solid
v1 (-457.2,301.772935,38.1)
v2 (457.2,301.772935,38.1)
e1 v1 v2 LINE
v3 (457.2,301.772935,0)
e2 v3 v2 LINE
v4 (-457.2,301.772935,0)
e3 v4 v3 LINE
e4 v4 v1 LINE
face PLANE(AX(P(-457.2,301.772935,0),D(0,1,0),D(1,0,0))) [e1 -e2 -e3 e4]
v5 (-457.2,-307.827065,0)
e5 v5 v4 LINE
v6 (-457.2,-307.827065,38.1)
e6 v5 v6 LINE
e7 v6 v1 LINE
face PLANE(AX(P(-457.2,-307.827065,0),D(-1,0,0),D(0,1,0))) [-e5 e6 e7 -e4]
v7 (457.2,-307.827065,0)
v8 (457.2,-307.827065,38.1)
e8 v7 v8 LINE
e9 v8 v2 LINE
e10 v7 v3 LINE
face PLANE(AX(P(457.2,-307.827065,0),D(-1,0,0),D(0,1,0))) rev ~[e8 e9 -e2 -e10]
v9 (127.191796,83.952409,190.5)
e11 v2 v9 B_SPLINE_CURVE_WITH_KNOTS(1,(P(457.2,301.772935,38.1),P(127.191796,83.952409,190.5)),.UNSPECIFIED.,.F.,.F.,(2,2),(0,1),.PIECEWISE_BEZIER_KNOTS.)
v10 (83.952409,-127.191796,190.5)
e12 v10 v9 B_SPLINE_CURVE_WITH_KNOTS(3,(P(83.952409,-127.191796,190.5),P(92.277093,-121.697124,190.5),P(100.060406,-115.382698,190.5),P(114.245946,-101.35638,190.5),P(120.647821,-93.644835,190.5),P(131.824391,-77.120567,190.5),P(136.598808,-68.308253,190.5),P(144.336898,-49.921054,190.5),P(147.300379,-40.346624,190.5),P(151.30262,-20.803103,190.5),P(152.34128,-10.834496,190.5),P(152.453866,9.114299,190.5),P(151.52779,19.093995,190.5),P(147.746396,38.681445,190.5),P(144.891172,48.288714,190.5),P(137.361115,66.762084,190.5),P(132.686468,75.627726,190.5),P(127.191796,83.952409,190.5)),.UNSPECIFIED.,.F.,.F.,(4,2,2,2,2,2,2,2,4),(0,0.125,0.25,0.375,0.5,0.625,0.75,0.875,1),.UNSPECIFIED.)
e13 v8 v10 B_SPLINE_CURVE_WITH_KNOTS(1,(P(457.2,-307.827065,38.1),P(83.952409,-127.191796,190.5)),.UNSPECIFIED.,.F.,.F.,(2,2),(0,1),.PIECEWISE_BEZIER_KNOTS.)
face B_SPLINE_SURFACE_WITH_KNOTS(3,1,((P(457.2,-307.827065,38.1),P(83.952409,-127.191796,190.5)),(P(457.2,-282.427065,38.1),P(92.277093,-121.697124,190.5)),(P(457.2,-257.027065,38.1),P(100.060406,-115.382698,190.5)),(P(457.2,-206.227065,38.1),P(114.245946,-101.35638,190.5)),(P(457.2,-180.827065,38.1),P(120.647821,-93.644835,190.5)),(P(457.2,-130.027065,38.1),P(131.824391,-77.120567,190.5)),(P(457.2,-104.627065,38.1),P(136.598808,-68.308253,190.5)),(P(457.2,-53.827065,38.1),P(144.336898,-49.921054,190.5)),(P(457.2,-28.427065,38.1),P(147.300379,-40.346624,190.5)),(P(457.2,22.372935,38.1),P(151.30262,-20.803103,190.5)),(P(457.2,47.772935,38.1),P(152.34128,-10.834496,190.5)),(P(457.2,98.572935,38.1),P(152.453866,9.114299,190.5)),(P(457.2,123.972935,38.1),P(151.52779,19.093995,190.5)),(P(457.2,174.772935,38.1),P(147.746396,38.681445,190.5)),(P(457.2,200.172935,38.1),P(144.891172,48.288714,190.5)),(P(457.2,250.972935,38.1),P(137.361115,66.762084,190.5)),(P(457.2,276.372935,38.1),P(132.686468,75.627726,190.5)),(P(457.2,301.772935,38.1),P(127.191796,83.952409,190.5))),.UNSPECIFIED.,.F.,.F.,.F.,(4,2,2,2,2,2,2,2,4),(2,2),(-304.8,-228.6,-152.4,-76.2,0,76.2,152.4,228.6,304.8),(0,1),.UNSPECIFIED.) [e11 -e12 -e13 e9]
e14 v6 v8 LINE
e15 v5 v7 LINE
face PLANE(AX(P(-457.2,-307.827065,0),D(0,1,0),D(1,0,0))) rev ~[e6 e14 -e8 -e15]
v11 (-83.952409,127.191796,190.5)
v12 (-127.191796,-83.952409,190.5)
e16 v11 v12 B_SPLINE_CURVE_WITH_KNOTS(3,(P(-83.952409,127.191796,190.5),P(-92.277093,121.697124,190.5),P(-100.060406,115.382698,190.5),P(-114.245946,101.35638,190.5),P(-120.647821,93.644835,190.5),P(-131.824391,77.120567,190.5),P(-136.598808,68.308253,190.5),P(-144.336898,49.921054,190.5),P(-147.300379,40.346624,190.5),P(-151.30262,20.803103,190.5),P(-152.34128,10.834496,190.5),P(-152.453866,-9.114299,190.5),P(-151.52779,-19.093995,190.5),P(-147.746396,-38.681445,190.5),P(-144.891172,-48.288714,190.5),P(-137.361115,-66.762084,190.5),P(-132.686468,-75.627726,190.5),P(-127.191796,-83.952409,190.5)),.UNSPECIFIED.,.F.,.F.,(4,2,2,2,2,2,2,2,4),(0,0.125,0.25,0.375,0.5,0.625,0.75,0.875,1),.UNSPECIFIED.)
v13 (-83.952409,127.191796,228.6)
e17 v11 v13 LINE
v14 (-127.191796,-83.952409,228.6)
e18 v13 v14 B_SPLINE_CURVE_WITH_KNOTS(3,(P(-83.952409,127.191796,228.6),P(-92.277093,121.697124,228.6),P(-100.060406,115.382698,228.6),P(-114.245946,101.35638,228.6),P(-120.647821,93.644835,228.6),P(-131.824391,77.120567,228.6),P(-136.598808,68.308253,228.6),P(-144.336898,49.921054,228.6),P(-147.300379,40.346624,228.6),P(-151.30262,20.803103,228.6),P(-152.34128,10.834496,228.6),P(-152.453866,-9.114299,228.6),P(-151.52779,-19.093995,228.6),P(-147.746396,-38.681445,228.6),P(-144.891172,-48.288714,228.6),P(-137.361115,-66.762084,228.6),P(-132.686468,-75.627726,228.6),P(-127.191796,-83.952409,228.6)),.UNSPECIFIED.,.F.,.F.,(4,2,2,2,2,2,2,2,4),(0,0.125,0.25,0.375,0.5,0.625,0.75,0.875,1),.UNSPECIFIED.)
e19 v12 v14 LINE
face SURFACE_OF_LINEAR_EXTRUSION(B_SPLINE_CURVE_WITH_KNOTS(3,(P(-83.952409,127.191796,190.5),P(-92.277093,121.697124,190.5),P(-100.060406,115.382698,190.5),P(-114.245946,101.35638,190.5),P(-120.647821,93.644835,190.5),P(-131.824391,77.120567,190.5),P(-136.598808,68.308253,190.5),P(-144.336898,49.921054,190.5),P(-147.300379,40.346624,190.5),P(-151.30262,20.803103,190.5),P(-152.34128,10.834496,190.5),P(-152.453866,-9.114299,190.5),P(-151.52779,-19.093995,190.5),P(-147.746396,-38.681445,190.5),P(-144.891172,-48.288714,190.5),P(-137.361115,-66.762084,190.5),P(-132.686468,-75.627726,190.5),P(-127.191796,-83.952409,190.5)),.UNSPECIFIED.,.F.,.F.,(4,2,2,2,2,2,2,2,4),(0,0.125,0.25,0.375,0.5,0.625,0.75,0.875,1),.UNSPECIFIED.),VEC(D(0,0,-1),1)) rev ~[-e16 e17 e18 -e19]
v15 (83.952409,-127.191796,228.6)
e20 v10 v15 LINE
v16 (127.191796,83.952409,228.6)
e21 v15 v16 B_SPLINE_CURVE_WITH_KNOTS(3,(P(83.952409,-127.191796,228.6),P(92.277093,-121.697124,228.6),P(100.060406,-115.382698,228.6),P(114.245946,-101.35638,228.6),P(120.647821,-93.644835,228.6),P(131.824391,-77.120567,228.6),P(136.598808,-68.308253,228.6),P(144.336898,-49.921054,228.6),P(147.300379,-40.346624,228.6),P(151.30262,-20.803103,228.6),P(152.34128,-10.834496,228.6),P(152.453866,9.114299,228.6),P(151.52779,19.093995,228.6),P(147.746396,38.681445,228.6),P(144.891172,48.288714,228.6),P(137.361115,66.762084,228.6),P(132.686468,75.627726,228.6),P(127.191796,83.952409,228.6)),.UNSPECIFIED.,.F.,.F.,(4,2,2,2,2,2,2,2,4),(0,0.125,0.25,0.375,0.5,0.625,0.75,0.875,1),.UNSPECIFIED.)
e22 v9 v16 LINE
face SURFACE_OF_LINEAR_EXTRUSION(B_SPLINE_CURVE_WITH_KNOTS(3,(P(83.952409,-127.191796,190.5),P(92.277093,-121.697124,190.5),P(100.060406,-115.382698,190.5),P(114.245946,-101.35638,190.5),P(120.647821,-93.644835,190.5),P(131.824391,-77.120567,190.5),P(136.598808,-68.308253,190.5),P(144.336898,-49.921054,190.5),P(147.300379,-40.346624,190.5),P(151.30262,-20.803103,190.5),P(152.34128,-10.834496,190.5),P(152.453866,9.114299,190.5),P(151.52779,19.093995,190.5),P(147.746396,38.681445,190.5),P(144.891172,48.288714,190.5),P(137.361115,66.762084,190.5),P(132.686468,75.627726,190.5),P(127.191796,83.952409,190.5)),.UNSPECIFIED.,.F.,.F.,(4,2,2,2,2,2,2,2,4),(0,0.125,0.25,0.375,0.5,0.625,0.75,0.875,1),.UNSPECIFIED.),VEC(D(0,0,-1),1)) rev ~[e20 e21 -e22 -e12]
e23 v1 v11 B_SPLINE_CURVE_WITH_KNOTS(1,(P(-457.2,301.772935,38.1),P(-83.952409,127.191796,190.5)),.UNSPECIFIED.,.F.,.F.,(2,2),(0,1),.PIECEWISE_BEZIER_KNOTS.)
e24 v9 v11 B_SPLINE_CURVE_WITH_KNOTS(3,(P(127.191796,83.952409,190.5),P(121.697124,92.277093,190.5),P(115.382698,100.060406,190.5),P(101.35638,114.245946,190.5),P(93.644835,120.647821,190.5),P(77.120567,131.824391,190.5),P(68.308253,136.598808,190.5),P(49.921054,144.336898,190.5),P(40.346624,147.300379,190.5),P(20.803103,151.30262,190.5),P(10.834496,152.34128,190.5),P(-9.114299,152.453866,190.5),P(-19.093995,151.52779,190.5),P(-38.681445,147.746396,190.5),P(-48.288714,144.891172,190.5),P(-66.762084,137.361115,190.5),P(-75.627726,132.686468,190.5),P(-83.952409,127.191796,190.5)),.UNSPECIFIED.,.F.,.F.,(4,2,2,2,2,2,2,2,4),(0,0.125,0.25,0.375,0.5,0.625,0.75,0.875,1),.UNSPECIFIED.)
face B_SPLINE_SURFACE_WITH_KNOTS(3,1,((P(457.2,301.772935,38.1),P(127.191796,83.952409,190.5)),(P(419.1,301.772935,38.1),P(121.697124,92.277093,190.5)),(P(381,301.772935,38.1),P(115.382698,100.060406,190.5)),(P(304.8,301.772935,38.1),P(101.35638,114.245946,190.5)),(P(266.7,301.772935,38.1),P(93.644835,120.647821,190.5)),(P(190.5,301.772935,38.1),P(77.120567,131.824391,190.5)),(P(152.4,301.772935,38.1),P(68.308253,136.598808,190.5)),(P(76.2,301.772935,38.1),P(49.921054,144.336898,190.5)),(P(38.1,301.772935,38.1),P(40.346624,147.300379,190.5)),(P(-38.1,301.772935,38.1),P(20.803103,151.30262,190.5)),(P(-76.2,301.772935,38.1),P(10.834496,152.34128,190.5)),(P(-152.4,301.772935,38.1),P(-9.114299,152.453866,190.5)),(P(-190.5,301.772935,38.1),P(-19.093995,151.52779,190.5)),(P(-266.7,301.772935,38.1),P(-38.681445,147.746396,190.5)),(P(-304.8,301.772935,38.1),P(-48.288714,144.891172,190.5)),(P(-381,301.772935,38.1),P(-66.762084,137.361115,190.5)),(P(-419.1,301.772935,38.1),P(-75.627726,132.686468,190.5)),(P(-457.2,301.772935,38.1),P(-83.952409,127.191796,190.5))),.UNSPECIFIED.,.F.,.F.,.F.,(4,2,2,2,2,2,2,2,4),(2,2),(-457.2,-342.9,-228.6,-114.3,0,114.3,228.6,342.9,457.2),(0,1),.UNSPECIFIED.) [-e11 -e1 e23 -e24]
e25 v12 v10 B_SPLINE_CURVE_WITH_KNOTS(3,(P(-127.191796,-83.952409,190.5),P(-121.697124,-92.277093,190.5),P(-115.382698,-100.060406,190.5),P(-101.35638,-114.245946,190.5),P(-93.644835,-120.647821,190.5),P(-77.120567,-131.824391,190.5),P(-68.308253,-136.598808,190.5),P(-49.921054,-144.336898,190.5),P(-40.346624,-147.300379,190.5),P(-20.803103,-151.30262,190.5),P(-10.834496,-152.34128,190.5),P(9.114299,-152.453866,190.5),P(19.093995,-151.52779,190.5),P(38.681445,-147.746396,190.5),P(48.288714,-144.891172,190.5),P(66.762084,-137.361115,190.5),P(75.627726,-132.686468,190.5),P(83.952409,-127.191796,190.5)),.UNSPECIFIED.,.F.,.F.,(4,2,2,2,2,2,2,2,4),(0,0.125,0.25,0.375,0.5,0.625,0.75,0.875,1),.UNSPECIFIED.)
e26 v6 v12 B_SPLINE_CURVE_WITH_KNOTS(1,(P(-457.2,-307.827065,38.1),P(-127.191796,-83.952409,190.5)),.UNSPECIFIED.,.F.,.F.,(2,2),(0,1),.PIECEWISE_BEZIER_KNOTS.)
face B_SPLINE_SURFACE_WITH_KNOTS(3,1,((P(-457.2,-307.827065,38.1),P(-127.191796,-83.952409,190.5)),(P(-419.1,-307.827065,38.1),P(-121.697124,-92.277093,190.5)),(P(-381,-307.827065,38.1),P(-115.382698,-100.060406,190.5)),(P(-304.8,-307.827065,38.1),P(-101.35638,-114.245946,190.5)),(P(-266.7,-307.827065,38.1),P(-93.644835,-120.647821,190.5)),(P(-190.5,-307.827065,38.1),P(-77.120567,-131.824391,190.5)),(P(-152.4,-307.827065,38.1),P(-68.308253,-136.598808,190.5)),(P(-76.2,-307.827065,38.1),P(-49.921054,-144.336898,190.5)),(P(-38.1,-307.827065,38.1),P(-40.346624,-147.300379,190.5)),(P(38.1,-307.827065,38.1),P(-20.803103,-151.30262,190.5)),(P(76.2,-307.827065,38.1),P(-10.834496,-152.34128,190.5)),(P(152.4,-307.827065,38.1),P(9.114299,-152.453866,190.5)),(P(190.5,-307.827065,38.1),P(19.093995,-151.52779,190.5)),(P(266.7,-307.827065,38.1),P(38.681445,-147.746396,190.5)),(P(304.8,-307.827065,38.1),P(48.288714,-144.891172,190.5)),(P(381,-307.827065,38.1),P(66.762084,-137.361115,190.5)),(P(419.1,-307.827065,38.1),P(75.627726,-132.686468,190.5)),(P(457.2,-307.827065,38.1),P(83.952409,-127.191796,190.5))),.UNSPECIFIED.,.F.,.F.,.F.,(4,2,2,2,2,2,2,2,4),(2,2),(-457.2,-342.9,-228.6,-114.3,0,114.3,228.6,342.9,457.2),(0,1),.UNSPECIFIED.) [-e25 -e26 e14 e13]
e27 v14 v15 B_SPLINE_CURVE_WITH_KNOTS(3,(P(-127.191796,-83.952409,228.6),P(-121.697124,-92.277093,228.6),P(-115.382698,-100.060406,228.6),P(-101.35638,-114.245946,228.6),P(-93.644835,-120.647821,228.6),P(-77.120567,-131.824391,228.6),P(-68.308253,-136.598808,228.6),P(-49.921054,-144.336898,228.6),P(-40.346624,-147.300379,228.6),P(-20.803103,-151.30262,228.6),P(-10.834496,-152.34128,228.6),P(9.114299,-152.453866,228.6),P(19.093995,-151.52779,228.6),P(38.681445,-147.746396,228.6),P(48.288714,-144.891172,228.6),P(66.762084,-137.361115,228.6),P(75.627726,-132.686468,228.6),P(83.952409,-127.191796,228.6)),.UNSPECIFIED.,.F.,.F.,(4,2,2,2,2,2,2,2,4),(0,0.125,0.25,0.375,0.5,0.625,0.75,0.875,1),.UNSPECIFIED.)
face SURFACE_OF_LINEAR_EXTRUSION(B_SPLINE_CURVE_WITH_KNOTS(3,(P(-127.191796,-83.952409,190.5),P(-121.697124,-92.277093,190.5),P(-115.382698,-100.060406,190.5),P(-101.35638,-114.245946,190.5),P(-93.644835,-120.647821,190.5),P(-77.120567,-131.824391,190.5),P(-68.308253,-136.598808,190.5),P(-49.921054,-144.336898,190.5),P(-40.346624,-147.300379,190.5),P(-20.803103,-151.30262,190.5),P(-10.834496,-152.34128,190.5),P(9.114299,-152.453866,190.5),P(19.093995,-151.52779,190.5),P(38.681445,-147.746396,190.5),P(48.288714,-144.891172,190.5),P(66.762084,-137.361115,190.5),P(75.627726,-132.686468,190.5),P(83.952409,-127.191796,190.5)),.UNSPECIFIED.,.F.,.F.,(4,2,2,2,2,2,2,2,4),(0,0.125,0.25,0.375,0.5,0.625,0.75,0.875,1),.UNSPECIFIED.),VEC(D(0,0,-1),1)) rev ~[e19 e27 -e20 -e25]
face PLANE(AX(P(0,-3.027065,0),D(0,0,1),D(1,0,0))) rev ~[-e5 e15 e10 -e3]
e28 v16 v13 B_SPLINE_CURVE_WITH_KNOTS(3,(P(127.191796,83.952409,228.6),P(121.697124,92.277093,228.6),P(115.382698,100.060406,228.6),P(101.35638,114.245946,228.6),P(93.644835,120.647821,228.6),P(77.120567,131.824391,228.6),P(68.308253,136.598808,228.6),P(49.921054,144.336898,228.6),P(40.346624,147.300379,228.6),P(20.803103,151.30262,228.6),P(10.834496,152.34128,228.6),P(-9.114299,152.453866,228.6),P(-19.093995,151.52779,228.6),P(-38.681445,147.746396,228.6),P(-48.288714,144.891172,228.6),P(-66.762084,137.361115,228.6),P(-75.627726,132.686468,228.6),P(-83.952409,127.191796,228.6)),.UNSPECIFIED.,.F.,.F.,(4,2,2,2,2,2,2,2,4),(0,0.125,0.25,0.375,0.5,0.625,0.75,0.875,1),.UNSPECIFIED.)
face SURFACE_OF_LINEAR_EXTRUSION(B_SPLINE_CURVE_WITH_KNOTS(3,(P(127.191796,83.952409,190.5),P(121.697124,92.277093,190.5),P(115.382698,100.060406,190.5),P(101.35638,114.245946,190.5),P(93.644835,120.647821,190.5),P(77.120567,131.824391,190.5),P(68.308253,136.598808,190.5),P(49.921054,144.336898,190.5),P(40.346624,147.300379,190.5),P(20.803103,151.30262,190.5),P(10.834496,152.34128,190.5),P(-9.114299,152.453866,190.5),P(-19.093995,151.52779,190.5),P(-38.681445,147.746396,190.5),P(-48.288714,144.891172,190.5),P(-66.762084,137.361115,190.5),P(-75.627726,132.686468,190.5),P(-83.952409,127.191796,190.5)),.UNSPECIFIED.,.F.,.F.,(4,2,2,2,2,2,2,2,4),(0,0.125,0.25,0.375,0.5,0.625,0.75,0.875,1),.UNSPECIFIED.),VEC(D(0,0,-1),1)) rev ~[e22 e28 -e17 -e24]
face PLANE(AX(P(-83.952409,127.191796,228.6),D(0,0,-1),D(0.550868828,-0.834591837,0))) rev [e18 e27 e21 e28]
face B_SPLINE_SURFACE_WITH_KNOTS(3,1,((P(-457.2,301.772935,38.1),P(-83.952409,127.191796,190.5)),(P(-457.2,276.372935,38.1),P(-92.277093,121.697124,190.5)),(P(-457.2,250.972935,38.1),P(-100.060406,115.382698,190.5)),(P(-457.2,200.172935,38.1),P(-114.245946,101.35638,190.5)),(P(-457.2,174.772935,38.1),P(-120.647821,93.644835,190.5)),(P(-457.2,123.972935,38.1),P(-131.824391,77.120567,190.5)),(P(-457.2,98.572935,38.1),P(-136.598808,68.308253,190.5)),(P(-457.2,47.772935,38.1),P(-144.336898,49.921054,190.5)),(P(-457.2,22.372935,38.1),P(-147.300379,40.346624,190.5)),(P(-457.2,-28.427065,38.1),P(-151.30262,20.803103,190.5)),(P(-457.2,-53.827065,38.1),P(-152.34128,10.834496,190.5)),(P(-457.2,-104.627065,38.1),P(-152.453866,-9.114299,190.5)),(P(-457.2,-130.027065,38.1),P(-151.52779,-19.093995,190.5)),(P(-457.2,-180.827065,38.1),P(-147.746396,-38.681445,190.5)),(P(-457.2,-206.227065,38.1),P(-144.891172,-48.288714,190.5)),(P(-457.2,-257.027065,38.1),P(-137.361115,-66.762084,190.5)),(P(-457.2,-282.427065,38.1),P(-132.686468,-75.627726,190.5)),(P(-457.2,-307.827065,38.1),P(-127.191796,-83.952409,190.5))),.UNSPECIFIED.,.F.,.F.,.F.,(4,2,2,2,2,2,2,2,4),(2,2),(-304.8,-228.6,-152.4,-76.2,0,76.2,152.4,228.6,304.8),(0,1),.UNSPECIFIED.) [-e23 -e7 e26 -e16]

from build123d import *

# Parameters (mm, degrees)
F0_W      = 914.4
F0_H      = 609.6
F1_DEPTH  = 38.1
F1_FACE_W = 914.4
F1_FACE_H = 609.6
F5_DEPTH  = 38.1


# Not quite as in the source:
# - the arcs of a loft's sections are written as splines that run evenly, so that the points pair up as in the source's solid


with BuildPart() as f1:
    # F0 (on Top) → F1 (new body)
    with BuildSketch(Plane.XY):
        with Locations((0, -3.0270647792)):
            Rectangle(F0_W, F0_H)
    extrude(amount=F1_DEPTH)

    # F1_face (on face) → F4 section 0
    with BuildSketch(Plane(origin=(0, -3.0270647792, 38.1), x_dir=(1, 0, 0), z_dir=(0, 0, 1))):
        Rectangle(F1_FACE_W, F1_FACE_H)
    # F3 (on offset) → F4 section 1
    with BuildSketch(Plane.XY.offset(190.5)):
        with BuildLine():
            add(Edge.make_bspline(
                [(127.1917959248, 83.9524094319), (121.6971235765, 92.2770930084), (115.3826976006, 100.0604061319), (101.3563796815, 114.245945568), (93.6448345666, 120.6478211153), (77.1205669567, 131.8243905093), (68.3082530567, 136.5988079933), (49.9210540934, 144.3368980513), (40.3466236897, 147.3003792857), (20.8031031174, 151.3026195462), (10.8344962009, 152.3412796091), (-9.1142994449, 152.4538662235), (-19.0939949009, 151.5277899911), (-38.6814445909, 147.7463963189), (-48.2887144867, 144.8911723815), (-66.7620835141, 137.3611152609), (-75.6277258553, 132.6864682732), (-83.9524094319, 127.1917959248)],
                knots=[0, 0, 0, 0, 0.125, 0.125, 0.25, 0.25, 0.375, 0.375, 0.5, 0.5, 0.625, 0.625, 0.75, 0.75, 0.875, 0.875, 1, 1, 1, 1], degree=3))
            add(Edge.make_bspline(
                [(-83.9524094319, 127.1917959248), (-92.2770930084, 121.6971235765), (-100.0604061319, 115.3826976006), (-114.245945568, 101.3563796815), (-120.6478211153, 93.6448345666), (-131.8243905093, 77.1205669567), (-136.5988079933, 68.3082530567), (-144.3368980513, 49.9210540934), (-147.3003792857, 40.3466236897), (-151.3026195462, 20.8031031174), (-152.3412796091, 10.8344962009), (-152.4538662235, -9.1142994449), (-151.5277899911, -19.0939949009), (-147.7463963189, -38.6814445909), (-144.8911723815, -48.2887144867), (-137.3611152609, -66.7620835141), (-132.6864682732, -75.6277258553), (-127.1917959248, -83.9524094319)],
                knots=[0, 0, 0, 0, 0.125, 0.125, 0.25, 0.25, 0.375, 0.375, 0.5, 0.5, 0.625, 0.625, 0.75, 0.75, 0.875, 0.875, 1, 1, 1, 1], degree=3))
            add(Edge.make_bspline(
                [(-127.1917959248, -83.9524094319), (-121.6971235765, -92.2770930084), (-115.3826976006, -100.0604061319), (-101.3563796815, -114.245945568), (-93.6448345666, -120.6478211153), (-77.1205669567, -131.8243905093), (-68.3082530567, -136.5988079933), (-49.9210540934, -144.3368980513), (-40.3466236897, -147.3003792857), (-20.8031031174, -151.3026195462), (-10.8344962009, -152.3412796091), (9.1142994449, -152.4538662235), (19.0939949009, -151.5277899911), (38.6814445909, -147.7463963189), (48.2887144867, -144.8911723815), (66.7620835141, -137.3611152609), (75.6277258553, -132.6864682732), (83.9524094319, -127.1917959248)],
                knots=[0, 0, 0, 0, 0.125, 0.125, 0.25, 0.25, 0.375, 0.375, 0.5, 0.5, 0.625, 0.625, 0.75, 0.75, 0.875, 0.875, 1, 1, 1, 1], degree=3))
            add(Edge.make_bspline(
                [(83.9524094319, -127.1917959248), (92.2770930084, -121.6971235765), (100.0604061319, -115.3826976006), (114.245945568, -101.3563796815), (120.6478211153, -93.6448345666), (131.8243905093, -77.1205669567), (136.5988079933, -68.3082530567), (144.3368980513, -49.9210540934), (147.3003792857, -40.3466236897), (151.3026195462, -20.8031031174), (152.3412796091, -10.8344962009), (152.4538662235, 9.1142994449), (151.5277899911, 19.0939949009), (147.7463963189, 38.6814445909), (144.8911723815, 48.2887144867), (137.3611152609, 66.7620835141), (132.6864682732, 75.6277258553), (127.1917959248, 83.9524094319)],
                knots=[0, 0, 0, 0, 0.125, 0.125, 0.25, 0.25, 0.375, 0.375, 0.5, 0.5, 0.625, 0.625, 0.75, 0.75, 0.875, 0.875, 1, 1, 1, 1], degree=3))
        make_face()
    loft(ruled=True)

    # F5 (add): a face of the model
    f5_faces = [f1.faces().sort_by_distance(p)[0] for p in [
        (0, 0, 190.5),
    ]]
    extrude(f5_faces, amount=F5_DEPTH)


solid = f1.part
